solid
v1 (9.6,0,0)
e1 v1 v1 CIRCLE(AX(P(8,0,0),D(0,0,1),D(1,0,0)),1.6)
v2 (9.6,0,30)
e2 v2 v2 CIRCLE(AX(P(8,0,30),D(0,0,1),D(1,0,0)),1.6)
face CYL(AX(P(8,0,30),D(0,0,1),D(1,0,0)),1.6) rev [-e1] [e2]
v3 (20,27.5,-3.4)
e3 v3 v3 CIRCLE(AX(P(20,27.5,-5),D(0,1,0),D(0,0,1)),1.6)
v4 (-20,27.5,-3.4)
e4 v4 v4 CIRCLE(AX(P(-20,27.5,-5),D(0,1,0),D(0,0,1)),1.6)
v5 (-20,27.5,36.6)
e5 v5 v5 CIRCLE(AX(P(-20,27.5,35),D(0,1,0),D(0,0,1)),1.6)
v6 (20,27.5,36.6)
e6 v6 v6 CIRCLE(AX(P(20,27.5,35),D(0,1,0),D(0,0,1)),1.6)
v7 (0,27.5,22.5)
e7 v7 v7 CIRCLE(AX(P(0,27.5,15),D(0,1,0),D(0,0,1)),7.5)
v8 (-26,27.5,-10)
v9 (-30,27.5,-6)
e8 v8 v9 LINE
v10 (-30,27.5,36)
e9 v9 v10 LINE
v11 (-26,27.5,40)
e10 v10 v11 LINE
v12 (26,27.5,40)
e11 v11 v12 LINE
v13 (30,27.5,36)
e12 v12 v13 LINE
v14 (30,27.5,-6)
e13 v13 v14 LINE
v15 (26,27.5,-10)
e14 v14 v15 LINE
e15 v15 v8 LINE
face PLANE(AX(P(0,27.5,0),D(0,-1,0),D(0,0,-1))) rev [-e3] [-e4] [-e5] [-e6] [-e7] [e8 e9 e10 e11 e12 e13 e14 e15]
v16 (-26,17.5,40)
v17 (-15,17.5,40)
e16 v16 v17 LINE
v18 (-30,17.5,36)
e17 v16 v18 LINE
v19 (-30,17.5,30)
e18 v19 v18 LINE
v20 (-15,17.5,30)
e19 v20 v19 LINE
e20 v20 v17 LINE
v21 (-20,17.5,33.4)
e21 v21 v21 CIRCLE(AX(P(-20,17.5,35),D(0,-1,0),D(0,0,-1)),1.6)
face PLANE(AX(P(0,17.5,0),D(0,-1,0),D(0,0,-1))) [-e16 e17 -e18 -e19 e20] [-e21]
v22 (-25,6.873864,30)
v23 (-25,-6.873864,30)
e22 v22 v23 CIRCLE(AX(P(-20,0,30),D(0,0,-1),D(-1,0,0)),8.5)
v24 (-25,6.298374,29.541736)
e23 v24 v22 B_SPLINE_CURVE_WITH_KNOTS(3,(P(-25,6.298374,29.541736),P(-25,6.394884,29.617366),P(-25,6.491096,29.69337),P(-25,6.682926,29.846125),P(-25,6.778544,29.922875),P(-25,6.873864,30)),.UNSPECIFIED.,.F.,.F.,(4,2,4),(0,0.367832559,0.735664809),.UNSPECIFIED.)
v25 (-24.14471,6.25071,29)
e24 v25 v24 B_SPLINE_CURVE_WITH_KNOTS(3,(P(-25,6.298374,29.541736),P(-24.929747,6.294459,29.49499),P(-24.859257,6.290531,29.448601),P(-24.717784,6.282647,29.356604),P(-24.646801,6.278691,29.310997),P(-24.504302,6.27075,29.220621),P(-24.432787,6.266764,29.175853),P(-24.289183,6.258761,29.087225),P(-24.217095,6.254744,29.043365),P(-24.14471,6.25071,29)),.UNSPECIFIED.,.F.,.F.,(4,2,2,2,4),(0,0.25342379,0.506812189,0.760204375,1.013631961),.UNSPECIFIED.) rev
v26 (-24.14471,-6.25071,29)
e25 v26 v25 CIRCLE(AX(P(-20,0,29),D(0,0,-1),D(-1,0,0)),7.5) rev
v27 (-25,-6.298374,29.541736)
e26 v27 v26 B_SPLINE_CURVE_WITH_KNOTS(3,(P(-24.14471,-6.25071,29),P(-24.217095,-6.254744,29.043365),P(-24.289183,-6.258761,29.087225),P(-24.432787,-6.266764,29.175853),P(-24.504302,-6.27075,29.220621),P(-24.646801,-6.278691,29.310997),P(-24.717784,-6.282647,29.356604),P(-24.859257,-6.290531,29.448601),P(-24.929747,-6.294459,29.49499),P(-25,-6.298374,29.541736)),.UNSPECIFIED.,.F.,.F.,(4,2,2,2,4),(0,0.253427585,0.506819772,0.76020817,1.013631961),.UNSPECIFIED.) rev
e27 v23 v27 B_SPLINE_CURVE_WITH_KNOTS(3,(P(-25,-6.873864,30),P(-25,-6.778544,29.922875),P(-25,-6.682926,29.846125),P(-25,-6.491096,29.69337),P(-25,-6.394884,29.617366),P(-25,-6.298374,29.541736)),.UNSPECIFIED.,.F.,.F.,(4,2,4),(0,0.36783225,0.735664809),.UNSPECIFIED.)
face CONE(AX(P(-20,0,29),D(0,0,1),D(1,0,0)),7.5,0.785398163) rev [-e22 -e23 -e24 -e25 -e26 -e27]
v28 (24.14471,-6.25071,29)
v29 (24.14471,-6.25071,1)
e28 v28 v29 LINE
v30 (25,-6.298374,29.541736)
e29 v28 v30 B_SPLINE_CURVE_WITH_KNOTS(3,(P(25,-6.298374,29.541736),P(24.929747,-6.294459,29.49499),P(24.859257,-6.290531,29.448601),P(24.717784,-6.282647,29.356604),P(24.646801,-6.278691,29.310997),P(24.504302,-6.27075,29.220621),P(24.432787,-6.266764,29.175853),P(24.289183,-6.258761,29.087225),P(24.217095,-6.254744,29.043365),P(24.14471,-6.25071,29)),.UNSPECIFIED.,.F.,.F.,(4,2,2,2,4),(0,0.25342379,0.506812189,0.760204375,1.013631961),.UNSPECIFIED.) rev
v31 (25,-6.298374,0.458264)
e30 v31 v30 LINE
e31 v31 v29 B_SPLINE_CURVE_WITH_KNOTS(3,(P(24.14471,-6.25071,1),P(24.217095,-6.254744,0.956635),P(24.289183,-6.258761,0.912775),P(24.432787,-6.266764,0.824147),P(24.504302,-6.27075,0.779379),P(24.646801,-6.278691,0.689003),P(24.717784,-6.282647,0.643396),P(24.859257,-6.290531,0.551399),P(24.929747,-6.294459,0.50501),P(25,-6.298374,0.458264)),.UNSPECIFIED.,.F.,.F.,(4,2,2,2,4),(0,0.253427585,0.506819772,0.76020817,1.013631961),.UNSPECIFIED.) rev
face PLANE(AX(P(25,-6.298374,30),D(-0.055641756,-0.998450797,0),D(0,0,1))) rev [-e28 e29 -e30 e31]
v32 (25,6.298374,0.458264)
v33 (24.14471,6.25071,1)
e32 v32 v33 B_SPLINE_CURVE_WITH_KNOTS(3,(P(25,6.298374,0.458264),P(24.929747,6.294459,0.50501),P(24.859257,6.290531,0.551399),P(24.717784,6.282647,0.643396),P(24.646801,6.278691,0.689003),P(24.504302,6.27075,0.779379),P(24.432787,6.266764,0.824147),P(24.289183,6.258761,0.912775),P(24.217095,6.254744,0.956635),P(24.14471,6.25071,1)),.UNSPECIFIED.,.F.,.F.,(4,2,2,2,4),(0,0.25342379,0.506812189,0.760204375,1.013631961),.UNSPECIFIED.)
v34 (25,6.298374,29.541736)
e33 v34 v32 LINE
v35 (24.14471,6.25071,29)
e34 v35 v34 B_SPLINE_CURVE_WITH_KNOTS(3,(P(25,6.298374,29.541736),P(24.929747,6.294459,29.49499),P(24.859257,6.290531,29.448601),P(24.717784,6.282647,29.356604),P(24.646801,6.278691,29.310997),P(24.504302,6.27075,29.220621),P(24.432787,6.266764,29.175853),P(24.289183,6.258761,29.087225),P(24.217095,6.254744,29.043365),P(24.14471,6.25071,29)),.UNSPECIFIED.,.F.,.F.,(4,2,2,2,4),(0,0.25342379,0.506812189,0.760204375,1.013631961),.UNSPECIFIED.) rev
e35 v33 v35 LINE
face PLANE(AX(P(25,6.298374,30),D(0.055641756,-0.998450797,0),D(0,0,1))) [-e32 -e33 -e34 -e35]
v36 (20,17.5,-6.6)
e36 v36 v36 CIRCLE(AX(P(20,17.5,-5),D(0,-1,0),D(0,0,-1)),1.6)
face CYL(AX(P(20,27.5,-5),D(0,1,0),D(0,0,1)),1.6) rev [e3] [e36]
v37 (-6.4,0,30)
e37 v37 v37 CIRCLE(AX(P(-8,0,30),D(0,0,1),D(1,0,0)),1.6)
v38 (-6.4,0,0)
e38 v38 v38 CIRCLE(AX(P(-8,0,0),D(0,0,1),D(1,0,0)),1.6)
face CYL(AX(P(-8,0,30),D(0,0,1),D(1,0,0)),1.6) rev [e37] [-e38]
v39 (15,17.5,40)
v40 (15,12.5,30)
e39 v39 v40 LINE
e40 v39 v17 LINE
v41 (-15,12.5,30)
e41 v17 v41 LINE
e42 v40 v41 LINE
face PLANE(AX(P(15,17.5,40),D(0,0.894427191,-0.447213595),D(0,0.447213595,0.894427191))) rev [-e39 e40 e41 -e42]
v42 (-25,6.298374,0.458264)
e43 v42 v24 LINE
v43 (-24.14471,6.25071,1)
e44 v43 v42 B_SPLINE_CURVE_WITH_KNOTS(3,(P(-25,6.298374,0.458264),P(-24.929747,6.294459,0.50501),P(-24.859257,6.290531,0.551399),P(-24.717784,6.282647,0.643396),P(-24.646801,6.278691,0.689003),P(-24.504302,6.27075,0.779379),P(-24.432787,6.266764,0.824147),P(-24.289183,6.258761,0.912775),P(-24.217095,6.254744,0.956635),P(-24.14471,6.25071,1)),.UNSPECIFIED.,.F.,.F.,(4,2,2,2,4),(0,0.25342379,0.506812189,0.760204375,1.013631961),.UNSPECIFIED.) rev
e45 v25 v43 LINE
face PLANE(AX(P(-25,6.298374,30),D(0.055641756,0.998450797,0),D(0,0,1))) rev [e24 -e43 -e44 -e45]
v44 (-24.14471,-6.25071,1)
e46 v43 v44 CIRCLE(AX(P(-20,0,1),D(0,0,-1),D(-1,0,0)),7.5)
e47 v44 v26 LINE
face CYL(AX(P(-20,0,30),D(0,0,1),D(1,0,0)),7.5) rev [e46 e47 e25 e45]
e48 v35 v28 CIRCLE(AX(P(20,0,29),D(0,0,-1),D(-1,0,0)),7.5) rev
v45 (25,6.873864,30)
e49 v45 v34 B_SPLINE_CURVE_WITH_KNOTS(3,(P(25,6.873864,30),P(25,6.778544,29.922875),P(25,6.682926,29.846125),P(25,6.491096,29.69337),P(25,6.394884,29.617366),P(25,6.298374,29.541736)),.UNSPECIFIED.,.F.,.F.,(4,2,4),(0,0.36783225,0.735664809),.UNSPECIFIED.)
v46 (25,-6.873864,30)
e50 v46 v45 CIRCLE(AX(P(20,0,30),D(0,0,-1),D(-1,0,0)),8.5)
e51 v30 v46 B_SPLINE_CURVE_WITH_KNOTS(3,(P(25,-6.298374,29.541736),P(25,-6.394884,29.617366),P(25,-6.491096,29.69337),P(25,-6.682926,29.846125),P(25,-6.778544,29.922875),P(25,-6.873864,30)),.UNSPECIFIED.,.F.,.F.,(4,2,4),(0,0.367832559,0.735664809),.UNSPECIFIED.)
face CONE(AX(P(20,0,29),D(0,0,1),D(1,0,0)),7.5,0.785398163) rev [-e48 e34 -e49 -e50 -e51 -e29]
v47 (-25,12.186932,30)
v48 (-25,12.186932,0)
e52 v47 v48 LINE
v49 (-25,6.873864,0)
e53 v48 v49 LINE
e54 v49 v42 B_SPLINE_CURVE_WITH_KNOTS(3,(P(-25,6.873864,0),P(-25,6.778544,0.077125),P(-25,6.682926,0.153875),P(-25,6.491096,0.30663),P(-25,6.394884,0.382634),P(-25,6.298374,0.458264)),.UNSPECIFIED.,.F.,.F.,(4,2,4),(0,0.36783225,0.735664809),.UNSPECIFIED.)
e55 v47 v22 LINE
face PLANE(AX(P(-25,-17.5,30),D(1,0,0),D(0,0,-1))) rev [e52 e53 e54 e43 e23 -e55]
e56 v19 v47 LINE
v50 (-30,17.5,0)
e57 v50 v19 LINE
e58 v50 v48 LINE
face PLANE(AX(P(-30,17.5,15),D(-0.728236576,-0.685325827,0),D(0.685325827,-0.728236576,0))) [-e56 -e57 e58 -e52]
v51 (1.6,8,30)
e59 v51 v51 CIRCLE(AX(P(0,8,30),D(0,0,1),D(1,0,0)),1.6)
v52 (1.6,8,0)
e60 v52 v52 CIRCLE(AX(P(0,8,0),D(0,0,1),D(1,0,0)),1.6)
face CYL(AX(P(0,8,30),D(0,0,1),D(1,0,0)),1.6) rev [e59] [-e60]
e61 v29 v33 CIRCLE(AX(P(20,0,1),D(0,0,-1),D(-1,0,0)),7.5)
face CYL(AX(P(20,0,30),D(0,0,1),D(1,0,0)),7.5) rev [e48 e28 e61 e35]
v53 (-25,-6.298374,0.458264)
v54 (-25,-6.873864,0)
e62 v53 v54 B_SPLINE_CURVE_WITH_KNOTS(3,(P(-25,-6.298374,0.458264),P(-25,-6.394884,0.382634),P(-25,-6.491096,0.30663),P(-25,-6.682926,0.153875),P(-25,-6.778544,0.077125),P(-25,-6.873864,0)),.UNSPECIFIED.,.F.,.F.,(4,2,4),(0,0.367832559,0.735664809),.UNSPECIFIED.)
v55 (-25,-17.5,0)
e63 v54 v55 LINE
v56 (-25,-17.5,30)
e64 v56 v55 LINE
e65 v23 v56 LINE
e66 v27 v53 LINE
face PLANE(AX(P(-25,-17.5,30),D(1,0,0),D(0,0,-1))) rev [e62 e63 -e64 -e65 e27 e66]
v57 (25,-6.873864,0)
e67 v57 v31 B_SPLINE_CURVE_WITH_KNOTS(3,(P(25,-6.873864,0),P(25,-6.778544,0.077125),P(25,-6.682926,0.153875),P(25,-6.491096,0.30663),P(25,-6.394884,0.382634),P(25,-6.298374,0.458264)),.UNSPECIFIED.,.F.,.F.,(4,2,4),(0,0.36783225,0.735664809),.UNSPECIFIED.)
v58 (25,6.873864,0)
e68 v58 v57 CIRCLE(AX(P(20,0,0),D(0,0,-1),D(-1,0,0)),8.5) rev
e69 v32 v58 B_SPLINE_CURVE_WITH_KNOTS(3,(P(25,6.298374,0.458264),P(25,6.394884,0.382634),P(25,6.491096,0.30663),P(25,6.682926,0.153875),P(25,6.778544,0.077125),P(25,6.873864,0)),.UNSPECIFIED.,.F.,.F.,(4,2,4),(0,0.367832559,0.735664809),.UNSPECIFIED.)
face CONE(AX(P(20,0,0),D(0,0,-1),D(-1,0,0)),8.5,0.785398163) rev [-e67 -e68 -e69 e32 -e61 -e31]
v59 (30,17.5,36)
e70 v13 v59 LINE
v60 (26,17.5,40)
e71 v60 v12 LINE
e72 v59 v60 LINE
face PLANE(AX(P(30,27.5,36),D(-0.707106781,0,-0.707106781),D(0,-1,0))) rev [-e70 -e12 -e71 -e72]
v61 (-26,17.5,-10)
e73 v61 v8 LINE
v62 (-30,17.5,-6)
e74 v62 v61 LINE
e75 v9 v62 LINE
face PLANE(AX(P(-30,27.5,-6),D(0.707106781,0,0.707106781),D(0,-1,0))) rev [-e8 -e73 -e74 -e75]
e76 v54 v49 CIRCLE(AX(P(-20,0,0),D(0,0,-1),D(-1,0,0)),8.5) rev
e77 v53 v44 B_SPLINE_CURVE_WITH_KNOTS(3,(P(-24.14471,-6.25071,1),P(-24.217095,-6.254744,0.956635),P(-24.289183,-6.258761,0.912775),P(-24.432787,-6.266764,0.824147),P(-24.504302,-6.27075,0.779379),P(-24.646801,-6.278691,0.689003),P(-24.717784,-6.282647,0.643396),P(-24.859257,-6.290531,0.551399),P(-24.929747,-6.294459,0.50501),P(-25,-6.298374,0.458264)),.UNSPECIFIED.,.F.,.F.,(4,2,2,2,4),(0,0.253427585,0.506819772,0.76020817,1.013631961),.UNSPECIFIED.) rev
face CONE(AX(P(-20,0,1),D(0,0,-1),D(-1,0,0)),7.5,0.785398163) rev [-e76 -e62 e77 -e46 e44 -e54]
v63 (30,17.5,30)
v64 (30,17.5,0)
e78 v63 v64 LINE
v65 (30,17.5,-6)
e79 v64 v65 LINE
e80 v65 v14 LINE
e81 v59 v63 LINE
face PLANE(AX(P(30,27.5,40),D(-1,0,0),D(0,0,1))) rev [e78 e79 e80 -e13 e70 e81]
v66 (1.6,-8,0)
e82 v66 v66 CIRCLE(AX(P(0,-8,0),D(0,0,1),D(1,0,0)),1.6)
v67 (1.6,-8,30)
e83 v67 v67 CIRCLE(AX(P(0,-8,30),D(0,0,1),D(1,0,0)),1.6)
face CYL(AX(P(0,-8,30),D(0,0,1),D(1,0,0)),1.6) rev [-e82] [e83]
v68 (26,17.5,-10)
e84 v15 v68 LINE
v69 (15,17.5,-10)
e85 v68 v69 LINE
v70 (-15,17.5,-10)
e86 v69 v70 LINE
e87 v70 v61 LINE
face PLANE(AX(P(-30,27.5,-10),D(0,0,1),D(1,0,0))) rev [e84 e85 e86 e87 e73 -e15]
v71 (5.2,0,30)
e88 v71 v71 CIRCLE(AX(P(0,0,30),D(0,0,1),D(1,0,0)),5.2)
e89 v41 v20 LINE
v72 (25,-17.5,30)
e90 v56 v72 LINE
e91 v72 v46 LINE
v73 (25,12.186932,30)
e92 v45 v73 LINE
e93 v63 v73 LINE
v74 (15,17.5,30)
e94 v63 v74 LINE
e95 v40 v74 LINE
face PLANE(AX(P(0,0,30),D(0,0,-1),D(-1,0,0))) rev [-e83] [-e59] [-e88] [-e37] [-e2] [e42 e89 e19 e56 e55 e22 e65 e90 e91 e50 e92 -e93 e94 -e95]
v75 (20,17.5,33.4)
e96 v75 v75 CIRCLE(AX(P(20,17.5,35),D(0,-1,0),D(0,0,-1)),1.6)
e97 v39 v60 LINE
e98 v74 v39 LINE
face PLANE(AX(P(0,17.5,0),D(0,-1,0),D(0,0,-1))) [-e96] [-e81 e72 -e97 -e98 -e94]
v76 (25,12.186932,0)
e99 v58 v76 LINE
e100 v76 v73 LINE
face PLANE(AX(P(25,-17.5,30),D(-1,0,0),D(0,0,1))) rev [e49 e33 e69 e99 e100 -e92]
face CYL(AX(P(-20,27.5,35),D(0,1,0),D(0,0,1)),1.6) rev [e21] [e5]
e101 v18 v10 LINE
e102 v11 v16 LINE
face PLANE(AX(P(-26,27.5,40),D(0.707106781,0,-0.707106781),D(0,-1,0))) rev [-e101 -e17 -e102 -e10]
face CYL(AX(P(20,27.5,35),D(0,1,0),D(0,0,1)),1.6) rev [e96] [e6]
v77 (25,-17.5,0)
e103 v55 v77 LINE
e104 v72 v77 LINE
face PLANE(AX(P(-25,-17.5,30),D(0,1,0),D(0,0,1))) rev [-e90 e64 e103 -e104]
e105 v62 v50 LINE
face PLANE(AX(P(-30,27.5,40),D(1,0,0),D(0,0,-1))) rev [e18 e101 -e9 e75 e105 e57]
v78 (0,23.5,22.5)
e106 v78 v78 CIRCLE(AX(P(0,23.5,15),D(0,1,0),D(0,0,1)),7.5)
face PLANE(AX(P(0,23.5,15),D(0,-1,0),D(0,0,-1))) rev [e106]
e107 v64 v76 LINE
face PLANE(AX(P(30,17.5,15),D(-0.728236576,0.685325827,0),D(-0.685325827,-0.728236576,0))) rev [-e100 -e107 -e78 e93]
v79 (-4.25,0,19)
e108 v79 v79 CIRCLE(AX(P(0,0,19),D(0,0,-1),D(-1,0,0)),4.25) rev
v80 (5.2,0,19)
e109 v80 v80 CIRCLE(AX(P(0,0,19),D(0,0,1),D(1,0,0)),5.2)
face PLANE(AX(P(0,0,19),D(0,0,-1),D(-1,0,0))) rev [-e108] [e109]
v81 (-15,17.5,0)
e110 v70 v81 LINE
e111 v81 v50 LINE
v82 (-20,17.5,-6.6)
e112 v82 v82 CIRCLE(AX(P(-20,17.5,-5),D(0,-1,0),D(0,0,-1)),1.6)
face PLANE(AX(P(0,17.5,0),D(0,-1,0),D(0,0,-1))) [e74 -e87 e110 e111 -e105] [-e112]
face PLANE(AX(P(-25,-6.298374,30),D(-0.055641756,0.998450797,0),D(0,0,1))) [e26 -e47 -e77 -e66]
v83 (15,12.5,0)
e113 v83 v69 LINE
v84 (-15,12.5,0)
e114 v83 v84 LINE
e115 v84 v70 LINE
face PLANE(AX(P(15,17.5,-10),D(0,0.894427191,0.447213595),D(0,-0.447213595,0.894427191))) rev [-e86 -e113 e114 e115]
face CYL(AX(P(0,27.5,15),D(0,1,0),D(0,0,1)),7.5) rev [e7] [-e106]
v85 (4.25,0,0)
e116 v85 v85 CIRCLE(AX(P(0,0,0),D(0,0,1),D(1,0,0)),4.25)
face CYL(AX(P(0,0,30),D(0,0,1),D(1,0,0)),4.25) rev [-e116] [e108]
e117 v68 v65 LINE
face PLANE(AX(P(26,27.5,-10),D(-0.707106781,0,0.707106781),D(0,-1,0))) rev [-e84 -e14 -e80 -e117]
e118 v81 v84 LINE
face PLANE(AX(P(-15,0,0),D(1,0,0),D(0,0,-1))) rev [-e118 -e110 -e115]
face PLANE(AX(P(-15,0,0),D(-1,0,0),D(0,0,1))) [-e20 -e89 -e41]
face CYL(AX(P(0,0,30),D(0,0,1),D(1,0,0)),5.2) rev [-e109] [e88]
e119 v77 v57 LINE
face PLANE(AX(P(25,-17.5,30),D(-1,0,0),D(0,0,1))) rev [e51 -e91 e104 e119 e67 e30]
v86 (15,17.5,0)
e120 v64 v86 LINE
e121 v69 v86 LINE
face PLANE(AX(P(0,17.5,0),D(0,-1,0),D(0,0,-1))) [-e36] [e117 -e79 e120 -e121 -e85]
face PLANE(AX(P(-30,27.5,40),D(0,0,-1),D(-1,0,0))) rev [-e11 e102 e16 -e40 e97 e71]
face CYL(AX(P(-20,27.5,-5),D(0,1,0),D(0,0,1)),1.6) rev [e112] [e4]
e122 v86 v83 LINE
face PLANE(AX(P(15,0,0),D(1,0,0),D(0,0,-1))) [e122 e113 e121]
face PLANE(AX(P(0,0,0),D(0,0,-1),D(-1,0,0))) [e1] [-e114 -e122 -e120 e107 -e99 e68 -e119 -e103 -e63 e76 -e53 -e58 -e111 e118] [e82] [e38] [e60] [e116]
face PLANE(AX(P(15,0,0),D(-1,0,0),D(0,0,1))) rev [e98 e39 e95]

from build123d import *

# Parameters (mm, degrees)
SKETCH_1_W          = 50
SKETCH_1_H          = 35
EXTRUDE_1_DEPTH     = 30
HOLE_WIZARD_360_D   = 8.5
HOLE_WIZARD_465_D   = 3.2
HOLE_WIZARD_619_D   = 15
CHAMFER_1_SIZE      = 1
CHAMFER_1_SIZE_2    = 0.708203932
HOLE_WIZARD_1_D     = 10.4
HOLE_WIZARD_1_DEPTH = 11
SKETCH_11_W         = 60
SKETCH_11_H         = 50
EXTRUDE_3_DEPTH     = 10
HOLE_WIZARD_2_D     = 3.2
CHAMFER_2_SIZE      = 4
HOLE_WIZARD_3_D     = 15
HOLE_WIZARD_3_DEPTH = 4
EXTRUDE_4_DEPTH     = 15
RIB_22_REACH        = 49.762
SKETCH_19_WALL_W    = 104.820665624
SKETCH_19_WALL_H    = 30


with BuildPart() as part:
    # 草图1 → 凸台-拉伸1 (new body)
    with BuildSketch(Plane.XY):
        Rectangle(SKETCH_1_W, SKETCH_1_H)
    extrude(amount=EXTRUDE_1_DEPTH)

    # Hole Wizard 360 (through all)
    with Locations(Plane.XY.offset(30)):
        with Locations((0, 0)):
            Hole(HOLE_WIZARD_360_D / 2)

    # Hole Wizard 465 (through all)
    with Locations(Plane.XY.offset(30)):
        with Locations((8, 0), (0, 8), (-8, 0), (0, -8)):
            Hole(HOLE_WIZARD_465_D / 2)

    # Hole Wizard 619 (through all)
    with Locations(Plane.XY.offset(30)):
        with Locations((20, 0), (-20, 0)):
            Hole(HOLE_WIZARD_619_D / 2)

    # 倒角1
    # the kernel refuses this chamfer: 1, 0.708203932 mm, written as the material it takes off along each edge
    with BuildSketch(Plane(origin=(-20, 0, 0), x_dir=(-0.8790200859122482, 0.4767847402789059, 0), z_dir=(-0.4767847402789059, -0.8790200859122482, 0))) as chamfer_1_piece_1:
        Polygon((7.5, -CHAMFER_1_SIZE), (7.5 + CHAMFER_1_SIZE, 0), (7.5, 0), align=None)
    revolve(axis=Axis((-20, 0, 0), (0, 0, -1)), revolution_arc=303.048763938, mode=Mode.SUBTRACT)
    with BuildSketch(Plane(origin=(-20, 0, 30), x_dir=(-0.879020085912248, 0.47678474027890627, 0), z_dir=(-0.47678474027890627, -0.879020085912248, 0))) as chamfer_1_piece_2:
        Polygon((7.5 + CHAMFER_1_SIZE, 0), (7.5, CHAMFER_1_SIZE), (7.5, 0), align=None)
    revolve(axis=Axis((-20, 0, 30), (0, 0, -1)), revolution_arc=303.048763938, mode=Mode.SUBTRACT)
    with BuildSketch(Plane(origin=(20, 0, 30), x_dir=(0.879020085912248, -0.4767847402789061, 0), z_dir=(0.4767847402789061, 0.879020085912248, 0))) as chamfer_1_piece_3:
        Polygon((7.5 + CHAMFER_1_SIZE, 0), (7.5, CHAMFER_1_SIZE), (7.5, 0), align=None)
    revolve(axis=Axis((20, 0, 30), (0, 0, -1)), revolution_arc=303.048763938, mode=Mode.SUBTRACT)
    with BuildSketch(Plane(origin=(20, 0, 0), x_dir=(0.8790200859122481, 0.476784740278906, 0), z_dir=(0.476784740278906, -0.8790200859122481, 0))) as chamfer_1_piece_4:
        Polygon((7.5, CHAMFER_1_SIZE), (7.5 + CHAMFER_1_SIZE, 0), (7.5, 0), align=None)
    revolve(axis=Axis((20, 0, 0), (0, 0, 1)), revolution_arc=303.048763938, mode=Mode.SUBTRACT)
    with BuildSketch(Plane(origin=(-25, 5.590169944, 32.778051389), x_dir=(0.7914486393779661, 0.611235675682274, 0), z_dir=(0, 0, -1)), Plane(origin=(25, -5.590169944, 32.778051389), x_dir=(-0.7914486393779661, -0.611235675682274, 0), z_dir=(0, 0, -1))) as chamfer_1_piece_5:
        with BuildLine():
            Line((1.080663788, 0), (CHAMFER_1_SIZE_2 * 0.611235676113, -CHAMFER_1_SIZE_2 * 0.791448639936))
            Line((CHAMFER_1_SIZE_2 * 0.611235676113, -CHAMFER_1_SIZE_2 * 0.791448639936), (0, 0))
            ThreePointArc((0, 0), (0.555522087, -0.019473843), (1.080663788, 0))
        make_face()
    extrude(amount=35.556102778, mode=Mode.SUBTRACT)
    with BuildSketch(Plane(origin=(-25, -5.590169944, 32.778051389), x_dir=(0.7914486393779665, -0.6112356756822735, 0), z_dir=(0, 0, -1))) as chamfer_1_piece_6:
        with BuildLine():
            Line((1.080663788, 0), (CHAMFER_1_SIZE_2 * 0.611235676113, CHAMFER_1_SIZE_2 * 0.791448639936))
            Line((CHAMFER_1_SIZE_2 * 0.611235676113, CHAMFER_1_SIZE_2 * 0.791448639936), (0, 0))
            ThreePointArc((0, 0), (0.555522087, 0.019473843), (1.080663788, 0))
        make_face()
    extrude(amount=35.556102778, mode=Mode.SUBTRACT)
    with BuildSketch(Plane(origin=(25, 5.590169944, 32.778051389), x_dir=(0, 1, 0), z_dir=(0, 0, -1))) as chamfer_1_piece_7:
        with BuildLine():
            Line((CHAMFER_1_SIZE_2, 0), (0.660540261, -0.855289885))
            ThreePointArc((0.660540261, -0.855289885), (0.354967464, -0.427764092), (0, 0))
            Line((0, 0), (CHAMFER_1_SIZE_2, 0))
        make_face()
    extrude(amount=35.556102778, mode=Mode.SUBTRACT)

    # 孔1
    with Locations(Plane.XY.offset(30)):
        with Locations((0, 0)):
            Hole(HOLE_WIZARD_1_D / 2, depth=HOLE_WIZARD_1_DEPTH)

    # 草图11 → 凸台-拉伸3 (add)
    with BuildSketch(Plane(origin=(0, 17.5, 0), x_dir=(1, 0, 0), z_dir=(0, 1, 0))):
        with Locations((0, -15)):
            Rectangle(SKETCH_11_W, SKETCH_11_H)
    extrude(amount=EXTRUDE_3_DEPTH)

    # 孔2 (through all)
    with Locations(Plane(origin=(0, 27.5, 0), x_dir=(1, 0, 0), z_dir=(0, 1, 0))):
        with Locations((-20, 5), (20, 5), (20, -35), (-20, -35)):
            Hole(HOLE_WIZARD_2_D / 2)

    # 倒角2
    chamfer_2_edges = [part.edges().sort_by_distance(p)[0] for p in [
        (30, 22.5, 40),
        (30, 22.5, -10),
        (-30, 22.5, -10),
        (-30, 22.5, 40),
    ]]
    chamfer(chamfer_2_edges, length=CHAMFER_2_SIZE)

    # 孔3
    with Locations(Plane(origin=(0, 27.5, 0), x_dir=(1, 0, 0), z_dir=(0, 1, 0))):
        with Locations((0, -15)):
            Hole(HOLE_WIZARD_3_D / 2, depth=HOLE_WIZARD_3_DEPTH)

    # 草图16 → 凸台-拉伸4 (add, symmetric)
    with BuildSketch(Plane(origin=(0, 0, 0), x_dir=(0, 0, -1), z_dir=(1, 0, 0))):
        Polygon((-40, 17.5), (-30, 12.5), (-30, 17.5), align=None)
        Polygon((10, 17.5), (0, 17.5), (0, 12.5), align=None)
    extrude(amount=EXTRUDE_4_DEPTH, both=True)

    # 草图19 wall → 筋22 (add, up to next)
    with BuildSketch(Plane(origin=(-27.5, 14.843465885, 15), x_dir=(0.685325827281, -0.728236575888, 0), z_dir=(0.728236575888, 0.685325827281, 0)), mode=Mode.PRIVATE) as rib_22_sk1:
        Rectangle(SKETCH_19_WALL_W, SKETCH_19_WALL_H)
    rib_22_tool1 = extrude(rib_22_sk1.sketch, amount=RIB_22_REACH, mode=Mode.PRIVATE) - part.part
    rib_22 = rib_22_tool1.solids().sort_by_distance((-27.5, 14.843465885, 15))[0]
    add(rib_22)

    # 镜向1: 筋22 across plane
    add(rib_22.mirror(Plane(origin=(0, 0, 0), x_dir=(0, 0, 1), z_dir=(1, 0, 0))))


solid = part.part
